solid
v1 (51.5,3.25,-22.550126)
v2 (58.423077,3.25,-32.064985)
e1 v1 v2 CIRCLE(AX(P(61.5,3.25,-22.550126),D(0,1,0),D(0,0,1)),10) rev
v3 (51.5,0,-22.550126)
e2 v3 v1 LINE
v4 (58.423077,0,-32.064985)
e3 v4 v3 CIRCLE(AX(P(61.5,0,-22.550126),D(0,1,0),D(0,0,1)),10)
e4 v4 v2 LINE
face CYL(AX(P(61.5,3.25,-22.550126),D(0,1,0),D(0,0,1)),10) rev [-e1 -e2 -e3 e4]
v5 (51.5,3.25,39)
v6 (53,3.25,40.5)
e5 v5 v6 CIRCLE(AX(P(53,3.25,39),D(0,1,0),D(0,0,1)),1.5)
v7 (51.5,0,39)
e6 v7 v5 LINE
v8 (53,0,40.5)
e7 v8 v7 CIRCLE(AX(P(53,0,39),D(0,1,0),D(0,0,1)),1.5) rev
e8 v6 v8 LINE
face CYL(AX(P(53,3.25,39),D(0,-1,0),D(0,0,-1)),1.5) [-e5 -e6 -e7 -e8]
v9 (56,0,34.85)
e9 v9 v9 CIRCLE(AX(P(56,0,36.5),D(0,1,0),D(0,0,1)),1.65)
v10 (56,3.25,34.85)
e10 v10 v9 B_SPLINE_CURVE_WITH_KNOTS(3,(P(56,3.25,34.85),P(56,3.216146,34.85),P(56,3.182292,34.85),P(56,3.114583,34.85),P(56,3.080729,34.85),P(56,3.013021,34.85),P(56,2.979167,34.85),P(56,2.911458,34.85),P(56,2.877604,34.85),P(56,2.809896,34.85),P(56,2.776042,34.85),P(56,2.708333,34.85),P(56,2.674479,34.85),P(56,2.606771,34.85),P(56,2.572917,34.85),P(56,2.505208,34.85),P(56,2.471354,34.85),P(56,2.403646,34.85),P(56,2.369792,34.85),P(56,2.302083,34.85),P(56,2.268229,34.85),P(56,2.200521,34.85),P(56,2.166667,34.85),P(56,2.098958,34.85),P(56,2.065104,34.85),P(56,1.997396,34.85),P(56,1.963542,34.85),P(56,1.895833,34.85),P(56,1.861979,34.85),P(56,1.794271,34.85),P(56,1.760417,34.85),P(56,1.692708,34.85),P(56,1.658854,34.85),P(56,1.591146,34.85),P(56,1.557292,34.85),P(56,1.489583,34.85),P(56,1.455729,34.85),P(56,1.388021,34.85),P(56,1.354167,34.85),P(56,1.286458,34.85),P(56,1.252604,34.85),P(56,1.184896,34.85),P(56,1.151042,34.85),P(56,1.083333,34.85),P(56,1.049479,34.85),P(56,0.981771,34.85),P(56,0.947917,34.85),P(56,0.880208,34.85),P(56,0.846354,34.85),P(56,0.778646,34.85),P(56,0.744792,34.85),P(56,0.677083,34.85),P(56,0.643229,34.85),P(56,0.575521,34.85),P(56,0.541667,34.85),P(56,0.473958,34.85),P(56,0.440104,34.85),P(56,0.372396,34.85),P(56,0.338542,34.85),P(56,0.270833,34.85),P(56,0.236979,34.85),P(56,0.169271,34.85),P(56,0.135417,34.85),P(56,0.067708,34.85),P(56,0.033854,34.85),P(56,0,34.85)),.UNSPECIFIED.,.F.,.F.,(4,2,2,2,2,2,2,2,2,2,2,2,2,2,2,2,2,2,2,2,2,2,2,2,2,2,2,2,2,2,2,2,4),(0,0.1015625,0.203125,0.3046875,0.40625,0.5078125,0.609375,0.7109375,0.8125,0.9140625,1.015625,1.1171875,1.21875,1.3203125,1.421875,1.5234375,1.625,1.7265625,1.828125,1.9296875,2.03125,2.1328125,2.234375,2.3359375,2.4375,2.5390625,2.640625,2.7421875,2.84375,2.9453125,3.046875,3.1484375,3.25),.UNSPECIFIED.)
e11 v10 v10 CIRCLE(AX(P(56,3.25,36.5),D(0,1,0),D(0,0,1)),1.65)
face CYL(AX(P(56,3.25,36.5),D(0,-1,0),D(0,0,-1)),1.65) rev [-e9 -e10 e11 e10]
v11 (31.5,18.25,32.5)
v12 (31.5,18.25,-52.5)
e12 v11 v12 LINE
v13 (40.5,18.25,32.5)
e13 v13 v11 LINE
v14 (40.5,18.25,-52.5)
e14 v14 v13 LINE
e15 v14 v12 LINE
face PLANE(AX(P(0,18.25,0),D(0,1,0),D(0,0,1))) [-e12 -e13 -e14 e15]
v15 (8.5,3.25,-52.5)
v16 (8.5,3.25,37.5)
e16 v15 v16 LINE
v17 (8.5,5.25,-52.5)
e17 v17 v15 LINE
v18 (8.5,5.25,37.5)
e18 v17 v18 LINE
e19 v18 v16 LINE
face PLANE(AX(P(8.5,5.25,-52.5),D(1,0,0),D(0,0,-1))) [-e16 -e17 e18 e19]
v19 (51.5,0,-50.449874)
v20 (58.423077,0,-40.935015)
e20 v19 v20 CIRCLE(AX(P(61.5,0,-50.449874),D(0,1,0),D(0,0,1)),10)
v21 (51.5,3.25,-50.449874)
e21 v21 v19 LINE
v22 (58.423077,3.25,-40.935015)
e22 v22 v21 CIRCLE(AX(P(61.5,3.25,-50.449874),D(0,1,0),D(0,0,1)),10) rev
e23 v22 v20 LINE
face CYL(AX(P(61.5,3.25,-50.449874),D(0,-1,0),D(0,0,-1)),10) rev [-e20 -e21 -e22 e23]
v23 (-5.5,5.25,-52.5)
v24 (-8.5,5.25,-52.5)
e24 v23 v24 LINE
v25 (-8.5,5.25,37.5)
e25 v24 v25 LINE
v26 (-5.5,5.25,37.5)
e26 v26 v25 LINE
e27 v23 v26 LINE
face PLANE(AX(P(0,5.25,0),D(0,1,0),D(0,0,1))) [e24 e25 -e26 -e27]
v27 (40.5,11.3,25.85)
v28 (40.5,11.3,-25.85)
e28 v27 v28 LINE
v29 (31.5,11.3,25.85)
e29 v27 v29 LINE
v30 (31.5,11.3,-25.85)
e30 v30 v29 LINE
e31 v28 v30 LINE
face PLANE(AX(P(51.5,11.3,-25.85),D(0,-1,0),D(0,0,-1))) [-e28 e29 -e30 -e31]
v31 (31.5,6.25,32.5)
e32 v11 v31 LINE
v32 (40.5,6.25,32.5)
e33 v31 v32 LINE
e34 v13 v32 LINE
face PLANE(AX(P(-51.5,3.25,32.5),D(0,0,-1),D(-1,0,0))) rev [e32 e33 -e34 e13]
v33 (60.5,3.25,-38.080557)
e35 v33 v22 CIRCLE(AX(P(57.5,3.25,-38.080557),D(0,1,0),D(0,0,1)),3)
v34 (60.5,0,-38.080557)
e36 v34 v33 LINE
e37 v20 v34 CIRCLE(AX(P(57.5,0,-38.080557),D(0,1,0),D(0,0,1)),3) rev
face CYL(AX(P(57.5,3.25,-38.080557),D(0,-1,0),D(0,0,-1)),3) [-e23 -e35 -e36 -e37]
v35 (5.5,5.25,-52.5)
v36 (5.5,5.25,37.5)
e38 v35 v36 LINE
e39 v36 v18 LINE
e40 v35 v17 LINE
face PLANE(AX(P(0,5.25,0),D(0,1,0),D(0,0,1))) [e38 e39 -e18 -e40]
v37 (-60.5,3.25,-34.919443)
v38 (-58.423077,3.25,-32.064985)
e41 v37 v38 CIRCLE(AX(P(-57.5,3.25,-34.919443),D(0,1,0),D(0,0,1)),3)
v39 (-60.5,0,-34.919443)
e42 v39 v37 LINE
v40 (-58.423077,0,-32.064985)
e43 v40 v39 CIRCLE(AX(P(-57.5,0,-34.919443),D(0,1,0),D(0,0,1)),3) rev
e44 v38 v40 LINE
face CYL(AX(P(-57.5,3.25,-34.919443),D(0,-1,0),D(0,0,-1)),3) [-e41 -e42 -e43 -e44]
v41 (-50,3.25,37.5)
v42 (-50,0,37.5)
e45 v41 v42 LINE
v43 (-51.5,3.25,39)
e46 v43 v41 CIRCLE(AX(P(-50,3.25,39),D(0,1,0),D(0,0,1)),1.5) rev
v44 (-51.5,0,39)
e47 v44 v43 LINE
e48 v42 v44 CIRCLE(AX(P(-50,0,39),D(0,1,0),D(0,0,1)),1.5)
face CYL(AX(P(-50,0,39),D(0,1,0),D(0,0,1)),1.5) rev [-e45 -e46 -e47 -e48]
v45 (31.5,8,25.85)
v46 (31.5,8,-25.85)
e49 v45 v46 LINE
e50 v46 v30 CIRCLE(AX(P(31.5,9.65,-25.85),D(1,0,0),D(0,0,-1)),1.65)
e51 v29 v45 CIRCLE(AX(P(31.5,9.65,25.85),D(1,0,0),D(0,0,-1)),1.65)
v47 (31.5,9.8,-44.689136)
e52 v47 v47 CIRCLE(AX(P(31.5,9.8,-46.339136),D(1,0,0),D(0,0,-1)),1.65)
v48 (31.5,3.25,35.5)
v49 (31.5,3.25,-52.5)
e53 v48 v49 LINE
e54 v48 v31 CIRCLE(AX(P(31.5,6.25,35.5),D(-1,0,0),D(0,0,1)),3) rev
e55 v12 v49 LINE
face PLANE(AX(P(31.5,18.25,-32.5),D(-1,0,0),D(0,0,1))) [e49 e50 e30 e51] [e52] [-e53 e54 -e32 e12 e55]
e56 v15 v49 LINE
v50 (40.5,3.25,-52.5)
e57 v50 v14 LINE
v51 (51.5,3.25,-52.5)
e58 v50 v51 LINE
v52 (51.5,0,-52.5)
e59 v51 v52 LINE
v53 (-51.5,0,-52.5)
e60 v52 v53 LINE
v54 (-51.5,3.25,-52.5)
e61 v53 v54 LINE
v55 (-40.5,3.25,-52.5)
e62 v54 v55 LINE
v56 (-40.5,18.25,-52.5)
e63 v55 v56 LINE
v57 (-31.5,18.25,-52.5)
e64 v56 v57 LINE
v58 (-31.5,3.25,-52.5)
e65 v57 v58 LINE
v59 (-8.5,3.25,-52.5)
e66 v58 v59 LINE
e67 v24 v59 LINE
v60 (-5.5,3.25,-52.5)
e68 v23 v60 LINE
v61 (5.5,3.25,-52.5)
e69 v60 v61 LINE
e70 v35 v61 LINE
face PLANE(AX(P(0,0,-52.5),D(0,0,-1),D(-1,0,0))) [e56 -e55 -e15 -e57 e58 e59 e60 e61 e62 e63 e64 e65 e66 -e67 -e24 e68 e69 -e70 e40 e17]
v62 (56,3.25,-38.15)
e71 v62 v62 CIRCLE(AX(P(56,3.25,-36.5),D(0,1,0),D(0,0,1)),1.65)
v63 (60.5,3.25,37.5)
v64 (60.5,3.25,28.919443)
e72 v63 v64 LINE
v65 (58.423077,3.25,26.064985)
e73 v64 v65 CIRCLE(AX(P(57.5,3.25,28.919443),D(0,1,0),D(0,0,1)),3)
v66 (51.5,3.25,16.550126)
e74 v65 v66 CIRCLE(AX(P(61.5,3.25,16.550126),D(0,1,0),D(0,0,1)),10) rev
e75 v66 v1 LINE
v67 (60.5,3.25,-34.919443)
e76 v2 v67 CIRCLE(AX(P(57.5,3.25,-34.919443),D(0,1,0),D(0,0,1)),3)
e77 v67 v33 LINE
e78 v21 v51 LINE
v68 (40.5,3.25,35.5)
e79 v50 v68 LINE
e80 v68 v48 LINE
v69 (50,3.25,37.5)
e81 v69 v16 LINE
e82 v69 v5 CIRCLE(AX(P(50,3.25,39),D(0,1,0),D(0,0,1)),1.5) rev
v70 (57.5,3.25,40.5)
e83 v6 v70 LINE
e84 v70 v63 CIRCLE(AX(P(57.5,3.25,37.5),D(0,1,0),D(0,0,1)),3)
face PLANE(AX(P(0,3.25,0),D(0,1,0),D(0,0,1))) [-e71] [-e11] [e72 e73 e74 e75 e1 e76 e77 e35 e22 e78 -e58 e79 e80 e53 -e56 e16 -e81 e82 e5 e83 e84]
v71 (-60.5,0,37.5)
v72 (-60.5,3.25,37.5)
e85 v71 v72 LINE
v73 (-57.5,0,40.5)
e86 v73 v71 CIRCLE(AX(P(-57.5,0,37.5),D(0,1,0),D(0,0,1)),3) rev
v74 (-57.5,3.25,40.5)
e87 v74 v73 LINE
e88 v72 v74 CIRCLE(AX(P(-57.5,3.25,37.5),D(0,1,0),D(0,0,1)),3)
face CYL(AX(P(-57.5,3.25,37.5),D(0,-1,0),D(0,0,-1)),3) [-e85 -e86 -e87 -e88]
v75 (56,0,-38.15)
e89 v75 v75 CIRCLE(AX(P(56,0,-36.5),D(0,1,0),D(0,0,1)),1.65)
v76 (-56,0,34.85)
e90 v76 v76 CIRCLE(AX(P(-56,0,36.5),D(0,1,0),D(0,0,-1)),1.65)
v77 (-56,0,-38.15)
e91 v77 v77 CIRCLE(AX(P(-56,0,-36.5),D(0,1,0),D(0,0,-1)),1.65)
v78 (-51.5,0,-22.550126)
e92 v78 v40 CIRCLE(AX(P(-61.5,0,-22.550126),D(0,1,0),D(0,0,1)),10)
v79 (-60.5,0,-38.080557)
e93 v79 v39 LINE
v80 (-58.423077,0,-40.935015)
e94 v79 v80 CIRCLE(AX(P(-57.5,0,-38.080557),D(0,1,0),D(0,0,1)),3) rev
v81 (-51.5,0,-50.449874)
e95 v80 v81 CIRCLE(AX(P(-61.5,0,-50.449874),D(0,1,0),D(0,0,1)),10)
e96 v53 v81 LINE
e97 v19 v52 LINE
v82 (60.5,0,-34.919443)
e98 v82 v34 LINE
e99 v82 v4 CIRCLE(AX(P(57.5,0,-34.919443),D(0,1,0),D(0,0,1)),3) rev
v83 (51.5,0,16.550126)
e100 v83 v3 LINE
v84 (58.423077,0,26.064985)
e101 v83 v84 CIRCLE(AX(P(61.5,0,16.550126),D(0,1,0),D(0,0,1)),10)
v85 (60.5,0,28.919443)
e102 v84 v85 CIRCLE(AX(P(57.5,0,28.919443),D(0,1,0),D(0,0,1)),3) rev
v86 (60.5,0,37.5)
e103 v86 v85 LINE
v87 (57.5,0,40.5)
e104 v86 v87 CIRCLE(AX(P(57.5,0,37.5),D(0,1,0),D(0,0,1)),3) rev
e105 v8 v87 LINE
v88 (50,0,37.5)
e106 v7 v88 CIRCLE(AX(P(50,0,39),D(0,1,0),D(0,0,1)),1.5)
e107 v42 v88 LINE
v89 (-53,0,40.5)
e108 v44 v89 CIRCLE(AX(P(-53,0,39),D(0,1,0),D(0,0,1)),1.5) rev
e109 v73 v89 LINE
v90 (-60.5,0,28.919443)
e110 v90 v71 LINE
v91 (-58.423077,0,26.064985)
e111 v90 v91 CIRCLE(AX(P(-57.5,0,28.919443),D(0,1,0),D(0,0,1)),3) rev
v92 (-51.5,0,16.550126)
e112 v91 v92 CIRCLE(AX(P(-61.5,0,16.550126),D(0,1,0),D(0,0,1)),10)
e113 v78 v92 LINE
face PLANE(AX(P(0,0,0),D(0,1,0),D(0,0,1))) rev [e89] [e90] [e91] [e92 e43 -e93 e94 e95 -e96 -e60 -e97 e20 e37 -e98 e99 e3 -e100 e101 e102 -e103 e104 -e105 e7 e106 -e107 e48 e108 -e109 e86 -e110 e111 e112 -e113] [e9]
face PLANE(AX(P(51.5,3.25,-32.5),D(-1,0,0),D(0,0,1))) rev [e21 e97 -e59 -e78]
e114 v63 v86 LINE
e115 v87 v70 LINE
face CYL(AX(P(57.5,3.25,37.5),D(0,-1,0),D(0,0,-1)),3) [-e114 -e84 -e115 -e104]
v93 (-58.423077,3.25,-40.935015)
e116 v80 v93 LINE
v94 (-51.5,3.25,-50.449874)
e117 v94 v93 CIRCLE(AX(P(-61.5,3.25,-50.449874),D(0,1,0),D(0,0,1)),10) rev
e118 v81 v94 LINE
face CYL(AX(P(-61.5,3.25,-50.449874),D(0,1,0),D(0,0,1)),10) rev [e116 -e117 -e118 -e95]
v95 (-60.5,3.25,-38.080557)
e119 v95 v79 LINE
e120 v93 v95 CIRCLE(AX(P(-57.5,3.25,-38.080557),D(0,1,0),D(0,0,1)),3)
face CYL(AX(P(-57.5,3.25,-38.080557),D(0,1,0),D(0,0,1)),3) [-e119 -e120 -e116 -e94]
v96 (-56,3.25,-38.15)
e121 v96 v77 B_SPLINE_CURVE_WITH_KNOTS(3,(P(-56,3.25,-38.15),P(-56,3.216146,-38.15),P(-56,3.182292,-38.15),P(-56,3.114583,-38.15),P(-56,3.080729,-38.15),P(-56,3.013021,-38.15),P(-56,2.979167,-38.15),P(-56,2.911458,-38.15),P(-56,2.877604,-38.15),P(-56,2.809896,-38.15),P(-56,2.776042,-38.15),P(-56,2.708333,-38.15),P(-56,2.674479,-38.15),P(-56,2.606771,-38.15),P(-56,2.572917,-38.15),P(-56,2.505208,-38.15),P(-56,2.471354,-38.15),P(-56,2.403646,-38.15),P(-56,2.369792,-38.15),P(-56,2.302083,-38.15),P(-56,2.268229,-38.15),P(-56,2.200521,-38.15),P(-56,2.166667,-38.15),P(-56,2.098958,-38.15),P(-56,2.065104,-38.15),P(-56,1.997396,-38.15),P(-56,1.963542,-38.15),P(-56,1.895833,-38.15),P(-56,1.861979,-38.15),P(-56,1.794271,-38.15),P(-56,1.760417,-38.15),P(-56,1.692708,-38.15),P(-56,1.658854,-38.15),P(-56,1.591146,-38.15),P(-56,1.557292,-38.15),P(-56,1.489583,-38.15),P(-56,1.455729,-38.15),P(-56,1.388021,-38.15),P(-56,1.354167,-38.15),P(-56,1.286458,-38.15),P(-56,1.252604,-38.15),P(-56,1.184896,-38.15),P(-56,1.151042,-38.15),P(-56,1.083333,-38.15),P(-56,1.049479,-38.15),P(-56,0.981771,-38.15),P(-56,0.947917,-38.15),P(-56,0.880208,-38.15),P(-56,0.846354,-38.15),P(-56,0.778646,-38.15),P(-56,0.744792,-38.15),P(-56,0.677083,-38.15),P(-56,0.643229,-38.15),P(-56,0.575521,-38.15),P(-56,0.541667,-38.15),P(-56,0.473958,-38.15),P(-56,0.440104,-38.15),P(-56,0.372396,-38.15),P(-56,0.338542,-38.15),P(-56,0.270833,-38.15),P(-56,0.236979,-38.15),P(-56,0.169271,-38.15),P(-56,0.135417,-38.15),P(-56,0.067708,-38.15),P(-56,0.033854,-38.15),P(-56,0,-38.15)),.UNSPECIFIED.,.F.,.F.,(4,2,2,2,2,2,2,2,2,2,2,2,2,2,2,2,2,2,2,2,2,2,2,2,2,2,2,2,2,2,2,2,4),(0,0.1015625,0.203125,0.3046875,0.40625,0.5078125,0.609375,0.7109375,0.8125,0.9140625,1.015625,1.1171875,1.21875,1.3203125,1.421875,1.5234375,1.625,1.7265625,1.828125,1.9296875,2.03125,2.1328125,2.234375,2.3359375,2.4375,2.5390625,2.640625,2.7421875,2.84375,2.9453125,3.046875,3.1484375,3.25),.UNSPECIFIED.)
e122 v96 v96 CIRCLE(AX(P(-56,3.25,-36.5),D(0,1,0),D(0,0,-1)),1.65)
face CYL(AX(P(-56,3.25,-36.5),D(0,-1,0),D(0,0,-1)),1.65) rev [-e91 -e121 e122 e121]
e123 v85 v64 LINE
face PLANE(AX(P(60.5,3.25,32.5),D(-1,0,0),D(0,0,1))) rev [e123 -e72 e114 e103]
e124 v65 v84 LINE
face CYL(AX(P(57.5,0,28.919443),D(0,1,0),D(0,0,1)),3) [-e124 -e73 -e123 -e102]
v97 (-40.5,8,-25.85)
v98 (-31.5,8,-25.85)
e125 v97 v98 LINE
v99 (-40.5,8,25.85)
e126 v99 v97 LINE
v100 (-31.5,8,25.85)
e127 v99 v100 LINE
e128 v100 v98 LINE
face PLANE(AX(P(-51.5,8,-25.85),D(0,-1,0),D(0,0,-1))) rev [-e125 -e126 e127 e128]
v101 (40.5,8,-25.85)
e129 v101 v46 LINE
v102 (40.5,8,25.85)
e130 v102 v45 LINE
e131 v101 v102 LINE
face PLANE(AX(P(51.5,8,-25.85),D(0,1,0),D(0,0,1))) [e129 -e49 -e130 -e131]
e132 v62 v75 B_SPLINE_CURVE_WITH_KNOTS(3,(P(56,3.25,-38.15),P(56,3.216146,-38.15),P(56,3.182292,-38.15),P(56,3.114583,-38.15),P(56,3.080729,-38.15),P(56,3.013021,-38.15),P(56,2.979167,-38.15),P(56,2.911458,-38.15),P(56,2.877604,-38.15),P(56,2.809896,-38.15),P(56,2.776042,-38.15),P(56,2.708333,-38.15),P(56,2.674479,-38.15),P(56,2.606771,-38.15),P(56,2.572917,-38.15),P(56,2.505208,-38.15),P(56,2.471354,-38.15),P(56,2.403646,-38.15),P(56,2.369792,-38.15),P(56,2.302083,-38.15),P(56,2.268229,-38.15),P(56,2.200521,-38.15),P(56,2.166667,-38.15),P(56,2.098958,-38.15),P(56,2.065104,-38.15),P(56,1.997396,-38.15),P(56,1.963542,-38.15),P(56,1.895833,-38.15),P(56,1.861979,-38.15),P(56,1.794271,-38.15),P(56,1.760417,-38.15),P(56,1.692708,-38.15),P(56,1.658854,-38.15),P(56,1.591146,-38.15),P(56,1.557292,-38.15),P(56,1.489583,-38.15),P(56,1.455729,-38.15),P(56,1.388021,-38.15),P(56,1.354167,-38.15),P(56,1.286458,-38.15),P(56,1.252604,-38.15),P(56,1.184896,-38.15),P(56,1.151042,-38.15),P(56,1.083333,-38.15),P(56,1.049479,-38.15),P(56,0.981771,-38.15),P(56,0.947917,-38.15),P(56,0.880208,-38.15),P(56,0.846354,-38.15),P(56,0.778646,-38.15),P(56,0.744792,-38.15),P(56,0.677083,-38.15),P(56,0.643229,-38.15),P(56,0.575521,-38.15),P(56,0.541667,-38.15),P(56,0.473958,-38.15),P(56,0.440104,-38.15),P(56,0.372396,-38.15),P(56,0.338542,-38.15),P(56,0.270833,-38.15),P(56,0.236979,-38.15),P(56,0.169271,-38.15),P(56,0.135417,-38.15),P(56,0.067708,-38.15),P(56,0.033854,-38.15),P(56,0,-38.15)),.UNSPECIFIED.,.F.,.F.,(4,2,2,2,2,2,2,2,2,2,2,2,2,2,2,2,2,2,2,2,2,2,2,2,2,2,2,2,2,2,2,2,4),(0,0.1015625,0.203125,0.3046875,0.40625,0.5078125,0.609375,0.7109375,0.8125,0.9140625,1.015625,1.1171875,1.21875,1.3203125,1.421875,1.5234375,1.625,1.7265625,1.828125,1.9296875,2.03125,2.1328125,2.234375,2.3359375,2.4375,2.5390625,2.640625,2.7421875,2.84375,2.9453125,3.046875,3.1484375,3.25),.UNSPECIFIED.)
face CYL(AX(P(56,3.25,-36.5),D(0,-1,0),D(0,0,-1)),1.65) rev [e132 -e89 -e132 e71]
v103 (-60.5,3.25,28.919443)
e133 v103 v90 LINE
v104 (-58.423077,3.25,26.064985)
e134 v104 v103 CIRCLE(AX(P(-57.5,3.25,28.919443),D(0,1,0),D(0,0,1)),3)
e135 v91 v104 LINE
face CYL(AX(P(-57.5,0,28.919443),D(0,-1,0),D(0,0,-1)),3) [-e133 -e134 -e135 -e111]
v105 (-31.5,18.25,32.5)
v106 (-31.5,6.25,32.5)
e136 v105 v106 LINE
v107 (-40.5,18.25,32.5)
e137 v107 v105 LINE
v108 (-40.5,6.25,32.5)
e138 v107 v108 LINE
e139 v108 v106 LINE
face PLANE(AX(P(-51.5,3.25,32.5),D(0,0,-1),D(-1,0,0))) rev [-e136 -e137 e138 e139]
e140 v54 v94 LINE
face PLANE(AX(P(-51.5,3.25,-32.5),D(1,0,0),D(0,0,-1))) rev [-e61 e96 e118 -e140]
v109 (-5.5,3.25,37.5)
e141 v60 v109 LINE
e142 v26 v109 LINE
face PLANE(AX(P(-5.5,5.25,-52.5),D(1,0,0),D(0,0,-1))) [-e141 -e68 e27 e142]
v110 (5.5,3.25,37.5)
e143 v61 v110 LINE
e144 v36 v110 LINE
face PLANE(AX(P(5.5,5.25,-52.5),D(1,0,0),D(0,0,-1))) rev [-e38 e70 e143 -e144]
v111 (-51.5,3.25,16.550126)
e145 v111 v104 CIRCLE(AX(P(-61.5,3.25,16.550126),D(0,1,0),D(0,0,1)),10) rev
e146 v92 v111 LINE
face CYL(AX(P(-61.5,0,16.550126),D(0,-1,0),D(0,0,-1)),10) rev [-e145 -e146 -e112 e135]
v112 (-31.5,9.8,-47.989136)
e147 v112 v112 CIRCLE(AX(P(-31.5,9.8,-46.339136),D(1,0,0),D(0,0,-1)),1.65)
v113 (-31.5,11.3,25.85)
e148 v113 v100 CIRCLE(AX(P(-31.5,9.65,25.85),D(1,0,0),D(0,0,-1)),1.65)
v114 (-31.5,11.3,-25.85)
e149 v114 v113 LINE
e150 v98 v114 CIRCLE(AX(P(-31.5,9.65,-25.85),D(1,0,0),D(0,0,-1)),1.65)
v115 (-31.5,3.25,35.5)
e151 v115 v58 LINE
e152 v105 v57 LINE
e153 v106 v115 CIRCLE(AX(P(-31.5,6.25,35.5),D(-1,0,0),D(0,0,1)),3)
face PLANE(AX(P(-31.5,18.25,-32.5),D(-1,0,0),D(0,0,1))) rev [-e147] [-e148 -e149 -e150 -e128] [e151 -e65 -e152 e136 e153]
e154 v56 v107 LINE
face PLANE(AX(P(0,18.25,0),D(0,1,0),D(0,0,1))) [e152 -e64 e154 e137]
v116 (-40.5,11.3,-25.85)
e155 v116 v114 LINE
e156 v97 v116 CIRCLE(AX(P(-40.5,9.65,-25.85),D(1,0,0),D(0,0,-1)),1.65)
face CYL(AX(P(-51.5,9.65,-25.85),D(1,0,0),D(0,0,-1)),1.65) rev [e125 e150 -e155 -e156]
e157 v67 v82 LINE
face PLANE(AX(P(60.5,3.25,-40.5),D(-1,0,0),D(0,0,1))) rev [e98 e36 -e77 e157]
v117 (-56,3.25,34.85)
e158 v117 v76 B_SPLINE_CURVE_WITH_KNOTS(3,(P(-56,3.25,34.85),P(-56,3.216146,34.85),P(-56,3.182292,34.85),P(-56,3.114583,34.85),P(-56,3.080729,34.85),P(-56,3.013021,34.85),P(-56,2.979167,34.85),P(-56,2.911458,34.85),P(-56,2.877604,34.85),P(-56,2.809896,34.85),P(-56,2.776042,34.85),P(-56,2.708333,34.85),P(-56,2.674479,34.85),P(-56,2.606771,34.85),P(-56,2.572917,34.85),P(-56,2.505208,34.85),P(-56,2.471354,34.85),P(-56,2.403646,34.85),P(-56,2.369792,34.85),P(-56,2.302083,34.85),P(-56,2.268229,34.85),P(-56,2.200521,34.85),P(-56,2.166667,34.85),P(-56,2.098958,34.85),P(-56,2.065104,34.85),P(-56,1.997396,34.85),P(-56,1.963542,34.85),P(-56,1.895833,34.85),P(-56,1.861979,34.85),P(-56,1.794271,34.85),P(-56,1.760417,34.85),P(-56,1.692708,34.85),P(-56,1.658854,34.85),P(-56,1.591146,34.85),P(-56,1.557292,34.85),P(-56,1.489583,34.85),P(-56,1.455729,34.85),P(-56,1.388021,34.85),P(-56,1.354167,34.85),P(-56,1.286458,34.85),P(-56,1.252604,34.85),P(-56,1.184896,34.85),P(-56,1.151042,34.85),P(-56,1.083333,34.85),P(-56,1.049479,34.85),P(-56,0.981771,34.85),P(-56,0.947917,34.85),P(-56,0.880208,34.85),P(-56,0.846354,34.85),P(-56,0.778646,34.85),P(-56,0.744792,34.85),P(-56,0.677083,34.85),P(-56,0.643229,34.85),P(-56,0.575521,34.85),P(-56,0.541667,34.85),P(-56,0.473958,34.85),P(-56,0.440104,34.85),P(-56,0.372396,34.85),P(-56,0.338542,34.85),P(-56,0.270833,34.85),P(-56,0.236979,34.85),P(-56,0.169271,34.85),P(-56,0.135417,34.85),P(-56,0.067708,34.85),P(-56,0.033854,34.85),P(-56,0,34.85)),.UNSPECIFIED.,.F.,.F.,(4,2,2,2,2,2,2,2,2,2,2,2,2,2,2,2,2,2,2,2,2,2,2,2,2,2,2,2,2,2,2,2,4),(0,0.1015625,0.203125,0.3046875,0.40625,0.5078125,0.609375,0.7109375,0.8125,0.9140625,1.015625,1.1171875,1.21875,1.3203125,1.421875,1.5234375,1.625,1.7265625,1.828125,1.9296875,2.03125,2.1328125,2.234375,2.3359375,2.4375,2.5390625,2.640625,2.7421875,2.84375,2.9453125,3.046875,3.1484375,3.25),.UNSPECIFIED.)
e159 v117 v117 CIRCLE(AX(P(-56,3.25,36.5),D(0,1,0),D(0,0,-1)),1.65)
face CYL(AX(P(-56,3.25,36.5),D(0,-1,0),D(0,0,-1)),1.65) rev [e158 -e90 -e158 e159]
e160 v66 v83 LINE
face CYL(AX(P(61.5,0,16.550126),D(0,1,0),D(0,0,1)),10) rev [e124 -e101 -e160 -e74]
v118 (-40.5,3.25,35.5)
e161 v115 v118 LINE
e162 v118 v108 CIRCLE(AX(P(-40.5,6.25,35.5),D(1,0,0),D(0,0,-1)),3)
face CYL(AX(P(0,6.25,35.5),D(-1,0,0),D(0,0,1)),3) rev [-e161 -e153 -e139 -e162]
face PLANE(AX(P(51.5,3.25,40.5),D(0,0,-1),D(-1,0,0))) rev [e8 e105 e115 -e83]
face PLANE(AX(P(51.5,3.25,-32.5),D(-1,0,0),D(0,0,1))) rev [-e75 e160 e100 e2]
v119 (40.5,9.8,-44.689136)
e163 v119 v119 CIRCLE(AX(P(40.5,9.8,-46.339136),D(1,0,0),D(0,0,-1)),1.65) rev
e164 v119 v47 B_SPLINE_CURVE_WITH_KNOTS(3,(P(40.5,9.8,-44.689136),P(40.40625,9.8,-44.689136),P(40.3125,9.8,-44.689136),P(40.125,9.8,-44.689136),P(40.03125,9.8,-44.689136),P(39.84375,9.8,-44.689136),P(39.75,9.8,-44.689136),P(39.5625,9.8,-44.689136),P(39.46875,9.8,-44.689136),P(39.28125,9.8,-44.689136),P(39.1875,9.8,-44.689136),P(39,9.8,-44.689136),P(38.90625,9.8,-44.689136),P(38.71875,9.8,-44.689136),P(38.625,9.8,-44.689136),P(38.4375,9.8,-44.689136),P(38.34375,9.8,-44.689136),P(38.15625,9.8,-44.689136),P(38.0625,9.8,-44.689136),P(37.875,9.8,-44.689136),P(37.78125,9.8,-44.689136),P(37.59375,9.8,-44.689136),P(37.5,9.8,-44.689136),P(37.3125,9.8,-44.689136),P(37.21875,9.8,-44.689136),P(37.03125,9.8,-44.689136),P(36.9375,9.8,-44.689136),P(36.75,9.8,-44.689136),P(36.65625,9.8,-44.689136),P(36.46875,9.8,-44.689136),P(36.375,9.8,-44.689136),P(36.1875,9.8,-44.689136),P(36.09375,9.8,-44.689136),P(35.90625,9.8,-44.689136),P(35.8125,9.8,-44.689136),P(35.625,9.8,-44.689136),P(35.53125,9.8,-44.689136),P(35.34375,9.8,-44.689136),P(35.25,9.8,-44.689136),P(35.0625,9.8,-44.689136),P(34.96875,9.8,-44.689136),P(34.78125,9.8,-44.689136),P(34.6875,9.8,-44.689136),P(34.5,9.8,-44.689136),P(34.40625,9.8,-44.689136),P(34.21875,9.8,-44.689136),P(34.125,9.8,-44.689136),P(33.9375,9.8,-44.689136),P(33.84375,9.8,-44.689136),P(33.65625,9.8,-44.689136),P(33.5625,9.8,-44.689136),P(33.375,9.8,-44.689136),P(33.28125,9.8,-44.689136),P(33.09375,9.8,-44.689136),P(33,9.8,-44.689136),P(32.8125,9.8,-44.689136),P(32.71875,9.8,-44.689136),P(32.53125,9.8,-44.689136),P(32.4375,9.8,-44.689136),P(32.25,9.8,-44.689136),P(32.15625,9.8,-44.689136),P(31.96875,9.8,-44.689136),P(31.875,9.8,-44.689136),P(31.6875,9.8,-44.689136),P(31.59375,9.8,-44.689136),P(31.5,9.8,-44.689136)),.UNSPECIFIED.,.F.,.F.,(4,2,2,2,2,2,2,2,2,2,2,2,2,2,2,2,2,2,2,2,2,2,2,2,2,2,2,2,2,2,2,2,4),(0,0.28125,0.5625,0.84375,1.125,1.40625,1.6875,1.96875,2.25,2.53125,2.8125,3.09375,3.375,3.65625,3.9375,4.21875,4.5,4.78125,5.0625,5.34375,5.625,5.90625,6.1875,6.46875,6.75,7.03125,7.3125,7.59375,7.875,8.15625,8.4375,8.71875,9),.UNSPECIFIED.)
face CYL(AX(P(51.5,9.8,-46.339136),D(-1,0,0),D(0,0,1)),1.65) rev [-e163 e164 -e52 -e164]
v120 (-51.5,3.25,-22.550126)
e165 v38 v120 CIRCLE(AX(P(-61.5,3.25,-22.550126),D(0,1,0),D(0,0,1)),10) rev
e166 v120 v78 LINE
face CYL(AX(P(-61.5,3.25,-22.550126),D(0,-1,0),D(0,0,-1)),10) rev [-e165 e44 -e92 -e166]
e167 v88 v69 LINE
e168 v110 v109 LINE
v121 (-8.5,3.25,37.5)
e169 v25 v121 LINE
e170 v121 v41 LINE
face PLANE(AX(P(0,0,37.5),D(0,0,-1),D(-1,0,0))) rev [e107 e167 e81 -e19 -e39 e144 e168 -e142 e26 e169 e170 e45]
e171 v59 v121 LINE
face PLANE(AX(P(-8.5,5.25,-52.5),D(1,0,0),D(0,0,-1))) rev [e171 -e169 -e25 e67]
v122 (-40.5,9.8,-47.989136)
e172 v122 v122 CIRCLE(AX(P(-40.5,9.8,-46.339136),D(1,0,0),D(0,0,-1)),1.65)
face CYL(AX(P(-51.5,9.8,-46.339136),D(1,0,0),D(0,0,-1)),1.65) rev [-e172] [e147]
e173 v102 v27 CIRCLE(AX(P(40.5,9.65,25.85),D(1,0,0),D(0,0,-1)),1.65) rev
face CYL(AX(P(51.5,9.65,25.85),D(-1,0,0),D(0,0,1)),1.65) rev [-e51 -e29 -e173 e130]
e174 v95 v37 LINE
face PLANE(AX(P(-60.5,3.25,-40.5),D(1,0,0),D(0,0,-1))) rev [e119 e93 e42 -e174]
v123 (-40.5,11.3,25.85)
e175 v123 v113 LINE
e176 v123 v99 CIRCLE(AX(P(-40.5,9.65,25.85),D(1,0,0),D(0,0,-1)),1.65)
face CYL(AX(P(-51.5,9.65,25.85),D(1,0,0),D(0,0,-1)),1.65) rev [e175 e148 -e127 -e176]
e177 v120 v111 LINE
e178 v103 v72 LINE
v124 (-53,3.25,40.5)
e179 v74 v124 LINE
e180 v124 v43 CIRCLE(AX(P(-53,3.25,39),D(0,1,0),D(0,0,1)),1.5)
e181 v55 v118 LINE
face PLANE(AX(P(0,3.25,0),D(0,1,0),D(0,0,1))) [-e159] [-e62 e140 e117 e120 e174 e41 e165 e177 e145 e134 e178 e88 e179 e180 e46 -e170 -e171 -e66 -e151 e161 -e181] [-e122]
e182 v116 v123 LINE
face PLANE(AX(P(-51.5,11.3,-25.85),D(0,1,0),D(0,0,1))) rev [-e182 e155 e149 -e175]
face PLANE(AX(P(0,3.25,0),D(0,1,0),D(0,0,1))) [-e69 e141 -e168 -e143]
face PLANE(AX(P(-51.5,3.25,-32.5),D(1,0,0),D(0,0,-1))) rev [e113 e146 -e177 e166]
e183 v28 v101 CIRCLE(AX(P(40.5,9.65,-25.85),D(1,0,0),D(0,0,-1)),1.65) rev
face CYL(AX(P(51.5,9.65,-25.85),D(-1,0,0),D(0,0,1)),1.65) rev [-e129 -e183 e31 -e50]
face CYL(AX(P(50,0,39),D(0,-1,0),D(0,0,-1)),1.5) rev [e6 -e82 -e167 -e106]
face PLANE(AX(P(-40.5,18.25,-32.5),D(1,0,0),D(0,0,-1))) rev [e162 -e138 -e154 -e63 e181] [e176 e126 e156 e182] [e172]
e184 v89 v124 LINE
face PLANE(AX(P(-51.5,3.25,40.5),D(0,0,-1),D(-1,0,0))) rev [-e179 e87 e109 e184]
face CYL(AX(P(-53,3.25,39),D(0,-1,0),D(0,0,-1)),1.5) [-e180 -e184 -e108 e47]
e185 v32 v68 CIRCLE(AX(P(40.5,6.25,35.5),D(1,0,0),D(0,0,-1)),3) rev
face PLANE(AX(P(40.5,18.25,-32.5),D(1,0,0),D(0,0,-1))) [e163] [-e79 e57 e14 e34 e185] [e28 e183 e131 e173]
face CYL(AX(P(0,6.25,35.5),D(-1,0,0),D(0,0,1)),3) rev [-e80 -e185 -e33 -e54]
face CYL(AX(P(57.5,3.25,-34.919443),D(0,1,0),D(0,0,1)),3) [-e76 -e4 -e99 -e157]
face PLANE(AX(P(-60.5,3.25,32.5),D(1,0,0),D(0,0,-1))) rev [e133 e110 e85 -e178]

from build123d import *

# Parameters (mm, degrees)
SKETCH1_W            = 103
SKETCH1_H            = 65
BOSS_EXTRUDE1_DEPTH  = 3.25
SKETCH2_W            = 9
SKETCH2_H            = 65
BOSS_EXTRUDE2_DEPTH  = 15
CUT_EXTRUDE1_DEPTH   = 91.985232318
BOSS_EXTRUDE3_DEPTH  = 20
SKETCH5_R            = 1.65
CUT_EXTRUDE2_DEPTH   = 100.891503643
SKETCH11_W           = 103
SKETCH11_H           = 3.25
BOSS_EXTRUDE8_DEPTH  = 5
SKETCH12_W           = 9
SKETCH12_H           = 8
SKETCH12_R           = 1.65
BOSS_EXTRUDE9_DEPTH  = 3.25
SKETCH15_W           = 9
SKETCH15_H           = 3.25
BOSS_EXTRUDE10_DEPTH = 6
FILLET1_R            = 10
FILLET2_R            = 1.5
FILLET3_R            = 3
FILLET4_R            = 3
SKETCH16_W           = 3
SKETCH16_H           = 90
BOSS_EXTRUDE11_DEPTH = 2


# Some blends are built 0.0001 mm under size
with BuildPart() as part:
    # Sketch1 → Boss-Extrude1 (new body)
    with BuildSketch(Plane(origin=(0, 0, 0), x_dir=(1, 0, 0), z_dir=(0, 1, 0))):
        Rectangle(SKETCH1_W, SKETCH1_H)
    extrude(amount=BOSS_EXTRUDE1_DEPTH)

    # Sketch2 → Boss-Extrude2 (add)
    with BuildSketch(Plane(origin=(0, 3.25, 0), x_dir=(1, 0, 0), z_dir=(0, 1, 0))):
        with Locations((-36, 0)):
            Rectangle(SKETCH2_W, SKETCH2_H)
    boss_extrude2 = extrude(amount=BOSS_EXTRUDE2_DEPTH)

    # Sketch3 → Cut-Extrude1 (cut, through all)
    with BuildSketch(Plane(origin=(-31.5, 0, 0), x_dir=(0, 0, -1), z_dir=(1, 0, 0))):
        with BuildLine():
            Line((25.85, 8), (-25.85, 8))
            ThreePointArc((-25.85, 8), (-27.5, 9.65), (-25.85, 11.3))
            Line((-25.85, 11.3), (25.85, 11.3))
            ThreePointArc((25.85, 11.3), (27.5, 9.65), (25.85, 8))
        make_face()
    cut_extrude1 = extrude(amount=-CUT_EXTRUDE1_DEPTH, mode=Mode.SUBTRACT)

    # Sketch4 → Boss-Extrude3 (add)
    with BuildSketch(Plane(origin=(0, 0, -32.5), x_dir=(-1, 0, 0), z_dir=(0, 0, -1))):
        Polygon((51.5, 3.25), (40.5, 3.25), (40.5, 18.25), (31.5, 18.25), (31.5, 3.25), (-51.5, 3.25), (-51.5, 0), (51.5, 0), align=None)
    boss_extrude3 = extrude(amount=BOSS_EXTRUDE3_DEPTH)

    # Sketch5 → Cut-Extrude2 (cut, through all)
    with BuildSketch(Plane(origin=(-31.5, 0, 0), x_dir=(0, 0, -1), z_dir=(1, 0, 0))):
        with Locations((46.339135755, 9.8)):
            Circle(SKETCH5_R)
    cut_extrude2 = extrude(amount=-CUT_EXTRUDE2_DEPTH, mode=Mode.SUBTRACT)

    # Mirror1: Boss-Extrude2, Cut-Extrude1, Boss-Extrude3, Cut-Extrude2 across plane
    add(boss_extrude2.mirror(Plane(origin=(0, 0, 0), x_dir=(0, 0, 1), z_dir=(1, 0, 0))))
    add(cut_extrude1.mirror(Plane(origin=(0, 0, 0), x_dir=(0, 0, 1), z_dir=(1, 0, 0))), mode=Mode.SUBTRACT)
    add(boss_extrude3.mirror(Plane(origin=(0, 0, 0), x_dir=(0, 0, 1), z_dir=(1, 0, 0))))
    add(cut_extrude2.mirror(Plane(origin=(0, 0, 0), x_dir=(0, 0, 1), z_dir=(1, 0, 0))), mode=Mode.SUBTRACT)

    # Sketch11 → Boss-Extrude8 (add)
    with BuildSketch(Plane.XY.offset(32.5)):
        with Locations((0, 1.625)):
            Rectangle(SKETCH11_W, SKETCH11_H)
    extrude(amount=BOSS_EXTRUDE8_DEPTH)

    # Sketch12 → Boss-Extrude9 (add)
    # profile 1 of 4: a face of its own
    with BuildSketch(Plane(origin=(0, 0, 0), x_dir=(1, 0, 0), z_dir=(0, 1, 0))):
        with Locations((56, -36.5)):
            Rectangle(SKETCH12_W, SKETCH12_H)
        with Locations(Location((56, -36.5, 0), (0, 0, 90))):
            Circle(SKETCH12_R, mode=Mode.SUBTRACT)
    # profile 2 of 4: a face of its own
    with BuildSketch(Plane(origin=(0, 0, 0), x_dir=(1, 0, 0), z_dir=(0, 1, 0))):
        with Locations((56, 36.5)):
            Rectangle(SKETCH12_W, SKETCH12_H)
        with Locations(Location((56, 36.5, 0), (0, 0, 90))):
            Circle(SKETCH12_R, mode=Mode.SUBTRACT)
    # profile 3 of 4: a face of its own
    with BuildSketch(Plane(origin=(0, 0, 0), x_dir=(1, 0, 0), z_dir=(0, 1, 0))):
        with Locations((-56, 36.5)):
            Rectangle(SKETCH12_W, SKETCH12_H)
        with Locations(Location((-56, 36.5, 0), (0, 0, 90))):
            Circle(SKETCH12_R, mode=Mode.SUBTRACT)
    # profile 4 of 4: a face of its own
    with BuildSketch(Plane(origin=(0, 0, 0), x_dir=(1, 0, 0), z_dir=(0, 1, 0))):
        with Locations((-56, -36.5)):
            Rectangle(SKETCH12_W, SKETCH12_H)
        with Locations(Location((-56, -36.5, 0), (0, 0, 90))):
            Circle(SKETCH12_R, mode=Mode.SUBTRACT)
    extrude(amount=BOSS_EXTRUDE9_DEPTH)

    # Sketch15 → Boss-Extrude10 (add)
    with BuildSketch(Plane(origin=(0, 0, 32.5), x_dir=(-1, 0, 0), z_dir=(0, 0, -1))):
        with Locations((56, 1.625)):
            Rectangle(SKETCH15_W, SKETCH15_H)
        with Locations((-56, 1.625)):
            Rectangle(SKETCH15_W, SKETCH15_H)
    extrude(amount=BOSS_EXTRUDE10_DEPTH)

    # Fillet1
    # the kernel refuses this fillet: 10 mm, written as the material it adds along each edge
    with BuildSketch(Plane(origin=(51.5, 0, 26.5), x_dir=(1, 0, 0), z_dir=(0, 1, 0)), Plane(origin=(51.5, 0, -40.5), x_dir=(1, 0, 0), z_dir=(0, 1, 0)), Plane(origin=(-51.5, 0, -32.5), x_dir=(-1, 0, 0), z_dir=(0, 1, 0))) as fillet1_piece_1:
        with BuildLine():
            CenterArc((10, 9.949874371), FILLET1_R, 180, 84.260829523)
            Line((0, 9.949874371), (-0.2, 9.949874371))
            Line((-0.2, 9.949874371), (-0.2, 0))
            Line((-0.2, 0), (0, -0.2))
            ThreePointArc((0, -0.2), (4.5, -0.2), (8.98, -0.198997487))
            Line((8.98, -0.198997487), (9, 0))
        make_face()
    extrude(amount=3.25)
    with BuildSketch(Plane(origin=(51.5, 0, -32.5), x_dir=(0, 0, 1), z_dir=(0, 1, 0)), Plane(origin=(-51.5, 0, -40.5), x_dir=(0, 0, -1), z_dir=(0, 1, 0))) as fillet1_piece_2:
        with BuildLine():
            CenterArc((9.949874371, 10), FILLET1_R, 185.739170477, 84.260829523)
            Line((0, 9), (-0.198997487, 8.98))
            ThreePointArc((-0.198997487, 8.98), (-0.2, 4.5), (-0.2, 0))
            Line((-0.2, 0), (0, -0.2))
            Line((0, -0.2), (9.949874371, -0.2))
            Line((9.949874371, -0.2), (9.949874371, 0))
        make_face()
    extrude(amount=3.25)
    with BuildSketch(Plane(origin=(-51.5, 3.25, 26.5), x_dir=(0, 0, -1), z_dir=(0, -1, 0))) as fillet1_piece_3:
        with BuildLine():
            CenterArc((9.949874371, -10), FILLET1_R, 90, 84.260829523)
            Line((0, -9), (-0.198997487, -8.98))
            ThreePointArc((-0.198997487, -8.98), (-0.2, -4.5), (-0.2, 0))
            Line((-0.2, 0), (0, 0.2))
            Line((0, 0.2), (9.949874371, 0.2))
            Line((9.949874371, 0.2), (9.949874371, 0))
        make_face()
    extrude(amount=3.25)

    # Fillet2
    fillet2_edges = [part.edges().sort_by_distance(p)[0] for p in [
        (-51.5, 1.625, 37.5),
        (51.5, 1.625, 37.5),
    ]]
    fillet(fillet2_edges, radius=FILLET2_R)
    fillet2_2_edges = [part.edges().sort_by_distance(p)[0] for p in [
        (-51.5, 1.625, 40.5),
        (51.5, 1.625, 40.5),
    ]]
    fillet(fillet2_2_edges, radius=FILLET2_R - 0.0001)  # a hair under: the kernel refuses the full size

    # Fillet3
    fillet3_edges = [part.edges().sort_by_distance(p)[0] for p in [
        (-60.5, 1.625, 40.5),
        (-60.5, 1.625, -40.5),
        (-60.5, 1.625, -32.5),
        (60.5, 1.625, -40.5),
        (60.5, 1.625, -32.5),
        (60.5, 1.625, 40.5),
        (-60.5, 1.625, 26.5),
        (60.5, 1.625, 26.5),
    ]]
    fillet(fillet3_edges, radius=FILLET3_R)

    # Fillet4
    fillet4_edges = [part.edges().sort_by_distance(p)[0] for p in [
        (-36, 3.25, 32.5),
        (36, 3.25, 32.5),
    ]]
    fillet(fillet4_edges, radius=FILLET4_R)

    # Sketch16 → Boss-Extrude11 (add)
    with BuildSketch(Plane(origin=(0, 3.25, 0), x_dir=(1, 0, 0), z_dir=(0, 1, 0))):
        with Locations((-7, 7.5)):
            Rectangle(SKETCH16_W, SKETCH16_H)
    boss_extrude11 = extrude(amount=BOSS_EXTRUDE11_DEPTH)

    # Mirror2: Boss-Extrude11 across plane
    add(boss_extrude11.mirror(Plane(origin=(0, 0, 0), x_dir=(0, 0, 1), z_dir=(1, 0, 0))))


solid = part.part
